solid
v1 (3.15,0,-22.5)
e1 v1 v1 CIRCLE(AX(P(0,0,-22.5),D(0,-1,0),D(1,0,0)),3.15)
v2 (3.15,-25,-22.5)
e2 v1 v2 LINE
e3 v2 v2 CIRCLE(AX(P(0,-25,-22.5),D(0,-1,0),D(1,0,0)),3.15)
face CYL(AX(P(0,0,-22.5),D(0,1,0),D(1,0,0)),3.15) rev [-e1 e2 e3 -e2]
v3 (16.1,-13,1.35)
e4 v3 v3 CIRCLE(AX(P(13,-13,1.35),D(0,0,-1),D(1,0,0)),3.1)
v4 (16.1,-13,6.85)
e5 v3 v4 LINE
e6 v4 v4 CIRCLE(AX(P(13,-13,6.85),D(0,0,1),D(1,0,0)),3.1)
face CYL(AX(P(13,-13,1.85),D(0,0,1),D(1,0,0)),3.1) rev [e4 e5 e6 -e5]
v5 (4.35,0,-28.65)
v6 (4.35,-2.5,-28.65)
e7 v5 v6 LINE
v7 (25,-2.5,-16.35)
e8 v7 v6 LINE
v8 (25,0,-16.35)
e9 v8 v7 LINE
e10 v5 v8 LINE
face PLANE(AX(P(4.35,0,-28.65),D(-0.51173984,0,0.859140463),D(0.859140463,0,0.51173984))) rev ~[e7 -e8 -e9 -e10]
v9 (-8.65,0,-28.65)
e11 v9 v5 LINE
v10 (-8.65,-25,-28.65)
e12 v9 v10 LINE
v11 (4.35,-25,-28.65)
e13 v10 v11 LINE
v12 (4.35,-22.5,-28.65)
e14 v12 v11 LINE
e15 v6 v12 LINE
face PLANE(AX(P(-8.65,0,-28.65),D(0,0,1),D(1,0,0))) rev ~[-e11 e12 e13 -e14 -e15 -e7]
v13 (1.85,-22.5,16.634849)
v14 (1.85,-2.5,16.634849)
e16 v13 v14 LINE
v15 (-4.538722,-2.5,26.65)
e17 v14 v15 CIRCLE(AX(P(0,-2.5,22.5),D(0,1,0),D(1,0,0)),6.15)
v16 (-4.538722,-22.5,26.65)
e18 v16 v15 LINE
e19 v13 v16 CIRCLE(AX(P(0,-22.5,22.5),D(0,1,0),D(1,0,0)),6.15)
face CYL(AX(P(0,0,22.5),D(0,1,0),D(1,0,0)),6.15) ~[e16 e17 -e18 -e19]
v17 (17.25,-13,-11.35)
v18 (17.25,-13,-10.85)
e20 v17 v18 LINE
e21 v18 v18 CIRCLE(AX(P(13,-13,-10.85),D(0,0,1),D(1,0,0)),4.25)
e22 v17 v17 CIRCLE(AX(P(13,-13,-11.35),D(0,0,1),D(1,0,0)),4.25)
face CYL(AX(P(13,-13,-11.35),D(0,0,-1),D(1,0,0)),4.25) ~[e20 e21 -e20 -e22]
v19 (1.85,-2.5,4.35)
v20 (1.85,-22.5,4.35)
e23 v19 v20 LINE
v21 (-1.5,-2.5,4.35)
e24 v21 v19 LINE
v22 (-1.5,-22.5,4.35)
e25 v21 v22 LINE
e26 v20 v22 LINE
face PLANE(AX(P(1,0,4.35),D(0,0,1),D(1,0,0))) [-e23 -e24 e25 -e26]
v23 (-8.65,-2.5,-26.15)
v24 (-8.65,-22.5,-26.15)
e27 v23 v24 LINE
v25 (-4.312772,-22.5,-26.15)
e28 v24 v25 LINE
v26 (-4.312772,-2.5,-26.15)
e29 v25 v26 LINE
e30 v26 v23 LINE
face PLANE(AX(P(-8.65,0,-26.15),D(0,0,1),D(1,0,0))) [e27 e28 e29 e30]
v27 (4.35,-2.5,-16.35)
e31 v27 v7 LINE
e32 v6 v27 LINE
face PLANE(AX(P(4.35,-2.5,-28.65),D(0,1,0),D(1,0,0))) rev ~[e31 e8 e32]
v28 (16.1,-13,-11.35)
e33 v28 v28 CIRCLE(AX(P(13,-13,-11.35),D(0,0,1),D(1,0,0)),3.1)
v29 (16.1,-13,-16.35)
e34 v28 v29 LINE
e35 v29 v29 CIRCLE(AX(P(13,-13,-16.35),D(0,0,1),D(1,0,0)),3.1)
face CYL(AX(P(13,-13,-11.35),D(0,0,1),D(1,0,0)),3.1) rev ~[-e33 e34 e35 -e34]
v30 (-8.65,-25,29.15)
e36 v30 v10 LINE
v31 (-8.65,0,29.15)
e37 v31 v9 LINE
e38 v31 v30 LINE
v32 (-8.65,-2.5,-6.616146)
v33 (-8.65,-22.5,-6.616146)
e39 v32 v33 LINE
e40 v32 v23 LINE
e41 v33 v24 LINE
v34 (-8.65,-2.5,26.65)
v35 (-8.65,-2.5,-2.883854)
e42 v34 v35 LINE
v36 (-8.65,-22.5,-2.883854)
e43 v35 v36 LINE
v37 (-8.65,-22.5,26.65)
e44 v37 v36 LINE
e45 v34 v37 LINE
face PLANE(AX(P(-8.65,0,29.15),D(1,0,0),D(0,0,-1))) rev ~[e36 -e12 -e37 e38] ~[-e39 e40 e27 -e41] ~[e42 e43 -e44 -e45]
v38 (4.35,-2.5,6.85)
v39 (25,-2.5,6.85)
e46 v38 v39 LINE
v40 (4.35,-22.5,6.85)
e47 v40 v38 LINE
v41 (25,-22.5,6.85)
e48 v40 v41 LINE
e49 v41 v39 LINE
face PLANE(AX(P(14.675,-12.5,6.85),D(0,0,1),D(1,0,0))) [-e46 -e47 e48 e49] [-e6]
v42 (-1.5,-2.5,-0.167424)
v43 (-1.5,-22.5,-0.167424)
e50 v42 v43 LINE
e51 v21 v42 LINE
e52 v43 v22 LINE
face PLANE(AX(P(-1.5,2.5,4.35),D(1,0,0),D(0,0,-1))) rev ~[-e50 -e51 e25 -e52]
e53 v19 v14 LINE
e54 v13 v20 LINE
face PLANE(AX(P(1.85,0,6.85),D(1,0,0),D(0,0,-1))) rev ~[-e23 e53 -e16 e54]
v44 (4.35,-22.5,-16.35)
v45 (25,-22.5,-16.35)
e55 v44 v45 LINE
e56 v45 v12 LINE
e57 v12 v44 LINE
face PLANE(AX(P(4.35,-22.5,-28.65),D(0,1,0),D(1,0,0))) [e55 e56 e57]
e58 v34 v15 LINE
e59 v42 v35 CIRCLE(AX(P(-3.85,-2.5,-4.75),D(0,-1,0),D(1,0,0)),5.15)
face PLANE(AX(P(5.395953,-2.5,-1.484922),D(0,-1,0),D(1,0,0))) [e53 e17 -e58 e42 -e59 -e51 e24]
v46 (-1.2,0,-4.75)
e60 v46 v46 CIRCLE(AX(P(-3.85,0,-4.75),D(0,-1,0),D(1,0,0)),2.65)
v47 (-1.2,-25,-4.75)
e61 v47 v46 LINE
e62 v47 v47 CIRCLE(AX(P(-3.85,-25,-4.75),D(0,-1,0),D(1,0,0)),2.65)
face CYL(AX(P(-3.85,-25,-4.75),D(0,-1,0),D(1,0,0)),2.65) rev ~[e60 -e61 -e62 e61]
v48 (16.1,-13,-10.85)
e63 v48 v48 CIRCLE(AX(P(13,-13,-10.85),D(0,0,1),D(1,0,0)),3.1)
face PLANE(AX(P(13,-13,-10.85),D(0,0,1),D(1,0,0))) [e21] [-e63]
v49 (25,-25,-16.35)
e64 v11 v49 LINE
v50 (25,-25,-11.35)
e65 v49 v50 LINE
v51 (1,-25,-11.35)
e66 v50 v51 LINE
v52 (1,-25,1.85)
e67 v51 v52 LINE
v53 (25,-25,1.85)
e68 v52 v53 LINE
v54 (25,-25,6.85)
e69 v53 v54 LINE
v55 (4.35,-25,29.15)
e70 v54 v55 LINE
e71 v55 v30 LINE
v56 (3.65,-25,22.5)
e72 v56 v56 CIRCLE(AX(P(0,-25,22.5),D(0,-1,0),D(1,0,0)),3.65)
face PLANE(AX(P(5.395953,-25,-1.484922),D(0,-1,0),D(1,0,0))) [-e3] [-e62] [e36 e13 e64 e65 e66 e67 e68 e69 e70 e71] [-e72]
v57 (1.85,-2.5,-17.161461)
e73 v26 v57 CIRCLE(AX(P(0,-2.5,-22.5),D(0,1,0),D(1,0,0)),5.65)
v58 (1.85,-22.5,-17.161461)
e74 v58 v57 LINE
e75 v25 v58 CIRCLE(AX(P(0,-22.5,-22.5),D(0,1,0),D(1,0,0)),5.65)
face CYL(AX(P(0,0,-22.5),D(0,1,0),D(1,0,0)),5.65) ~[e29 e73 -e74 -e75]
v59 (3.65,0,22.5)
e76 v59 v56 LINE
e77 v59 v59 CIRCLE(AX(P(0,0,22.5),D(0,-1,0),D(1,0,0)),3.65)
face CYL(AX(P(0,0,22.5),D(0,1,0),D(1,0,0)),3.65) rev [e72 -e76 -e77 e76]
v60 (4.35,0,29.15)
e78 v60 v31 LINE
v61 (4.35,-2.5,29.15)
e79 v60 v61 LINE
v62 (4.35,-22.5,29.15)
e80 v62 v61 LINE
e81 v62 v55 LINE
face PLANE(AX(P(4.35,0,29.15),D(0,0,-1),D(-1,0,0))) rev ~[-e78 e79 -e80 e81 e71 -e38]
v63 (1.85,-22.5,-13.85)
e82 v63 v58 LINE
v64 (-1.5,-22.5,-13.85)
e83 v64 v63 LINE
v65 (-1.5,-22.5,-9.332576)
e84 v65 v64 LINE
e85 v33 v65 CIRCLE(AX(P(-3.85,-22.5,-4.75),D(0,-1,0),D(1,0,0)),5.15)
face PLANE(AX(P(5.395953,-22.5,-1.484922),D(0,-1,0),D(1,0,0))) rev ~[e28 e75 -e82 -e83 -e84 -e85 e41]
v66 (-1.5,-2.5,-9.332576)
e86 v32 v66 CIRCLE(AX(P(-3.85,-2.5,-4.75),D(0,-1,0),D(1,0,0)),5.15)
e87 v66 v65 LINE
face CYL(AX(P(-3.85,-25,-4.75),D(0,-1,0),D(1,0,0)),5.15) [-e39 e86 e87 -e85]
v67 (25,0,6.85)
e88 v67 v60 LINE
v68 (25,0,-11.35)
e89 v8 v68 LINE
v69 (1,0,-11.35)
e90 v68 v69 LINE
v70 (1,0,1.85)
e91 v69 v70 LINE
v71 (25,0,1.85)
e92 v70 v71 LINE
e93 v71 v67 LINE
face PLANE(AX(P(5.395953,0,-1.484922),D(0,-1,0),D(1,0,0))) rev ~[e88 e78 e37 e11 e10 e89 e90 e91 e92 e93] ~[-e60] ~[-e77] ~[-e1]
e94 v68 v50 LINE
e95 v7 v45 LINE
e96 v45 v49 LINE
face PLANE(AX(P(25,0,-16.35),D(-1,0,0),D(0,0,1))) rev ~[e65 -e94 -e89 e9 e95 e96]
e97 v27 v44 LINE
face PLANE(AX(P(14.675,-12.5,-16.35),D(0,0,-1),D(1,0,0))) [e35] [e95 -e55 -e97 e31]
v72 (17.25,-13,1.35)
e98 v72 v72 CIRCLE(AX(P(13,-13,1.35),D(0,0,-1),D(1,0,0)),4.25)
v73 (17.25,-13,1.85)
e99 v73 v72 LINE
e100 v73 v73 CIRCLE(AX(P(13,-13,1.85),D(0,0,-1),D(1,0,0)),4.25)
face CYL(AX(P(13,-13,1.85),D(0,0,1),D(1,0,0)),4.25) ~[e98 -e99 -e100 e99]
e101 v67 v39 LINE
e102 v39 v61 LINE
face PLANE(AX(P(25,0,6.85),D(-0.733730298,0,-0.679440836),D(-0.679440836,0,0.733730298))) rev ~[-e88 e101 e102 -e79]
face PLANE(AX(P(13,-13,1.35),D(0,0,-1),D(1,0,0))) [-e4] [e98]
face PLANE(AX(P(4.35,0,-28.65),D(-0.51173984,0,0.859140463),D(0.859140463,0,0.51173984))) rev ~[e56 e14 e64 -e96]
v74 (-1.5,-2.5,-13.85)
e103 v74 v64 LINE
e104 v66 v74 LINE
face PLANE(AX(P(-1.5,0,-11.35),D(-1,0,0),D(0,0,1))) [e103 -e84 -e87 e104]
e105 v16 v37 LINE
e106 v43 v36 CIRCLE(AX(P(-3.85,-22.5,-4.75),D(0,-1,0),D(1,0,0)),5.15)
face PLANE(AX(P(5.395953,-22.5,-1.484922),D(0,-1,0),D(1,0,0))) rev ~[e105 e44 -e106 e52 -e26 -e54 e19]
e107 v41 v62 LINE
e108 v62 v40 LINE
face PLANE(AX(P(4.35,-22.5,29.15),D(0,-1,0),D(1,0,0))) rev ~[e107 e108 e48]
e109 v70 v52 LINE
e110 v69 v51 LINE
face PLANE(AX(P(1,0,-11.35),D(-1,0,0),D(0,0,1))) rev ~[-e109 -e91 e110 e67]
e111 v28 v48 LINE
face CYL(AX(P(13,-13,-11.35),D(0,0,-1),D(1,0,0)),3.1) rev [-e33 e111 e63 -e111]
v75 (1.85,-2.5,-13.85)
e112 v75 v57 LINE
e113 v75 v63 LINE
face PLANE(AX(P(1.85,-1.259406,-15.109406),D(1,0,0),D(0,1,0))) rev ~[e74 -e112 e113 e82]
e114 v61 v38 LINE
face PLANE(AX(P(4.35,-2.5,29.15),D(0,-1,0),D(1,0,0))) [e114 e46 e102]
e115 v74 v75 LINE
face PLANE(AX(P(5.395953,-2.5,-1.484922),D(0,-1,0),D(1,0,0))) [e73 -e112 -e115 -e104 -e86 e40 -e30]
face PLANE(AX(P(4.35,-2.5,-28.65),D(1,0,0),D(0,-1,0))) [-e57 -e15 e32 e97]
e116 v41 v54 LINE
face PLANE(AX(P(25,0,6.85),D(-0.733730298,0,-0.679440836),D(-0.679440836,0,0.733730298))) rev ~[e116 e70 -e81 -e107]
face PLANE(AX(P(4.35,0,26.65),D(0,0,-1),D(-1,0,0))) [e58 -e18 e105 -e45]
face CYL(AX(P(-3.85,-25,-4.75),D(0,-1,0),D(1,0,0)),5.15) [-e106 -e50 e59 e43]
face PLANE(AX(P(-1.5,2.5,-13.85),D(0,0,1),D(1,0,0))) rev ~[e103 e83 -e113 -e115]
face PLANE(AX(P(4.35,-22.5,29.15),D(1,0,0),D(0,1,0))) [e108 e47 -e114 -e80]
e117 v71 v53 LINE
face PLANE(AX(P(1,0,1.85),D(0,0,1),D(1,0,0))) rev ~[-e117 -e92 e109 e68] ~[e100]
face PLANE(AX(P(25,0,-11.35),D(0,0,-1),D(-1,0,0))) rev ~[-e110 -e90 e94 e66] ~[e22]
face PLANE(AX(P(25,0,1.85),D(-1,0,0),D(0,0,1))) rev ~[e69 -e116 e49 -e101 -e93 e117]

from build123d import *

# Parameters (mm, degrees)
F0_R          = 3.15
F0_R_2        = 3.65
F1_DEPTH      = 25
F2_R          = 3.1
F3_DEPTH      = 17.301
F3_DEPTH_BACK = 40.501
F2_R_2        = 4.25
F4_DEPTH      = 0.5
F5_R          = 4.25
F5_R_2        = 3.1
F6_DEPTH      = 0.5
F7_W          = 20.65
F7_H          = 20
F8_DEPTH      = 22.3
F9_W          = 20.65
F9_H          = 20
F10_DEPTH     = 12.3
F11_R         = 2.65
F12_DEPTH     = 25.001
F13_T         = 2.5
F13_T3_DEPTH  = 27.3
F13_T5_DEPTH  = 25.65
F13_T7_DEPTH  = 30
F13_T9_DEPTH  = 25
F13_T11_DEPTH = 17.3


# Not quite as in the source:
# - a shell that OpenCascade refuses in one call is made with other operations: the cavity is built on its own and cut out


with BuildPart() as f1:
    # F0 (on Front) → F1 (new body)
    with BuildSketch(Plane.XZ):
        Polygon((4.35, 29.15), (-8.65, 29.15), (-8.65, -28.65), (4.35, -28.65), (25, -16.35), (25, -11.35), (1, -11.35), (1, 1.85), (25, 1.85), (25, 6.85), align=None)
        with Locations((0, -22.5)):
            Circle(F0_R, mode=Mode.SUBTRACT)
        with Locations((0, 22.5)):
            Circle(F0_R_2, mode=Mode.SUBTRACT)
    extrude(amount=F1_DEPTH)

    # F2 (on face) → F3 (cut, two sides)
    with BuildSketch(Plane.XY.offset(-11.35)) as f3_sk:
        with Locations((13, -13)):
            Circle(F2_R)
    extrude(amount=-F3_DEPTH, mode=Mode.SUBTRACT)
    extrude(f3_sk.sketch, amount=F3_DEPTH_BACK, mode=Mode.SUBTRACT)

    # F2 (on face) → F4 (join)
    with BuildSketch(Plane.XY.offset(-11.35)):
        with Locations((13, -13)):
            Circle(F2_R_2)
        with Locations((13, -13)):
            Circle(F2_R, mode=Mode.SUBTRACT)
    extrude(amount=F4_DEPTH)

    # F5 (on face) → F6 (join)
    with BuildSketch(Plane(origin=(0, 0, 1.85), x_dir=(1, 0, 0), z_dir=(0, 0, -1))):
        with Locations((13, 13)):
            Circle(F5_R)
        with Locations((13, 13)):
            Circle(F5_R_2, mode=Mode.SUBTRACT)
    extrude(amount=F6_DEPTH)

    # F7 (on face) → F8 (cut)
    with BuildSketch(Plane.XY.offset(29.15)):
        with Locations((14.675, -12.5)):
            Rectangle(F7_W, F7_H)
    extrude(amount=-F8_DEPTH, mode=Mode.SUBTRACT)

    # F9 (on face) → F10 (cut)
    with BuildSketch(Plane(origin=(0, 0, -28.65), x_dir=(1, 0, 0), z_dir=(0, 0, -1))):
        with Locations((14.675, 12.5)):
            Rectangle(F9_W, F9_H)
    extrude(amount=-F10_DEPTH, mode=Mode.SUBTRACT)

    # F11 (on face) → F12 (cut, through all)
    with BuildSketch(Plane.XZ.offset(25)):
        with Locations((-3.85, -4.75)):
            Circle(F11_R)
    extrude(amount=-F12_DEPTH, mode=Mode.SUBTRACT)

    # F13: shell of thickness 2.5, made by hand


with BuildPart() as f13_core1:
    # F13_t2: copy of F1
    add(f1.part)

    # the walls: a layer under each face that stays
    f13_faces = [f13_core1.faces().sort_by_distance(p)[0] for p in [
        (14.675, -1.25, 18),
        (-3.0416666667, 0, -19.0166666667),
        (-2.15, -12.5, 29.15),
        (14.675, -2.5, 10.5666666667),
        (25, -12.5, 4.35),
        (5, -20.8333333333, 1.85),
        (1, -12.5, -4.75),
        (-2.15, -12.5, -28.65),
        (21, -20.8333333333, -11.35),
        (14.675, -1.25, -22.5),
        (25, -12.5, -13.85),
        (-6.5, -12.5, -4.75),
        (-3.15, -12.5, -22.5),
        (-3.65, -12.5, 22.5),
        (4.35, -12.5, 18),
        (14.675, -23.75, 18),
        (-3.0416666667, -25, -19.0166666667),
        (7.7916666667, -19.1666666667, 6.85),
        (8.75, -13, 1.6),
        (4.35, -12.5, -22.5),
        (14.675, -23.75, -22.5),
        (8.75, -13, -11.1),
        (7.7916666667, -2.5, -18.4),
        (7.7916666667, -5.8333333333, -16.35),
        (7.7916666667, -22.5, 10.5666666667),
        (9.9, -13, 4.35),
        (10.1666666667, -10.1666666667, 1.35),
        (14.675, -22.5, -18.4),
        (10.1666666667, -15.8333333333, -10.85),
        (9.9, -13, -13.85),
        (9.9, -13, 1.6),
        (9.9, -13, -11.1),
    ]]
    thicken(f13_faces, amount=-F13_T, mode=Mode.SUBTRACT)

    # F13_s4 → F13_t3 (cut)
    with BuildSketch(Plane.XY.offset(4.35)):
        Polygon((4.375, -2.525), (4.35, 0), (1.85, 0), (1.85, -2.5), align=None)
        Polygon((4.375, -22.475), (1.85, -22.5), (1.85, -25), (4.35, -25), align=None)
    extrude(amount=F13_T3_DEPTH, mode=Mode.SUBTRACT)

    # F13_s6 → F13_t5 (cut)
    with BuildSketch(Plane.YZ.offset(1.85)):
        Polygon((-2.525, 6.875), (0, 6.85), (0, 4.35), (-2.5, 4.35), align=None)
        Polygon((-22.475, 6.875), (-22.5, 4.35), (-25, 4.35), (-25, 6.85), align=None)
        Polygon((-2.525, -16.375), (0, -16.35), (0, -13.85), (-2.5, -13.85), align=None)
        Polygon((-22.475, -16.375), (-22.5, -13.85), (-25, -13.85), (-25, -16.35), align=None)
    extrude(amount=F13_T5_DEPTH, mode=Mode.SUBTRACT)

    # F13_s8 → F13_t7 (cut)
    with BuildSketch(Plane.XZ.offset(-2.5)):
        Polygon((1.025, 1.825), (1, 4.35), (-1.5, 4.35), (-1.5, 1.85), align=None)
        Polygon((1.025, -11.325), (-1.5, -11.35), (-1.5, -13.85), (1, -13.85), align=None)
    extrude(amount=F13_T7_DEPTH, mode=Mode.SUBTRACT)

    # F13_s10 → F13_t9 (cut)
    with BuildSketch(Plane.XZ):
        Polygon((4.375, 6.875), (1.85, 6.85), (1.85, 4.35), (4.35, 4.35), align=None)
        Polygon((4.375, -16.375), (1.85, -16.35), (1.85, -13.85), (4.35, -13.85), align=None)
    extrude(amount=F13_T9_DEPTH, mode=Mode.SUBTRACT)

    # F13_s12 → F13_t11 (cut)
    with BuildSketch(Plane.XY.offset(-31.15)):
        Polygon((4.375, -22.475), (1.85, -22.5), (1.85, -25), (4.35, -25), align=None)
        Polygon((4.375, -2.525), (1.85, -2.5), (1.85, 0), (4.35, 0), align=None)
    extrude(amount=F13_T11_DEPTH, mode=Mode.SUBTRACT)

    # F13_s13 → F13_t14 (revolve, cut)
    with BuildSketch(Plane.XZ.offset(13)):
        Polygon((17.275, 1.825), (17.25, 4.35), (14.75, 4.35), (14.75, 1.85), align=None)
    revolve(axis=Axis((13, -13, 1.85), (0, 0, -1)), mode=Mode.SUBTRACT)

    # F13_s15 → F13_t16 (revolve, cut)
    with BuildSketch(Plane.XZ.offset(13)):
        Polygon((17.275, -11.325), (17.25, -13.85), (14.75, -13.85), (14.75, -11.35), align=None)
    revolve(axis=Axis((13, -13, -11.35), (0, 0, 1)), mode=Mode.SUBTRACT)


with BuildPart() as f1_1:
    add(f1.part)

    # what is left inside the walls is the cavity
    f13_cavity = [f13_core1.part.solids().sort_by_distance(p)[0] for p in [
        (-8.625, -15.833333, 11.883073),
        (-8.625, -15.833333, -16.383073),
    ]]
    add(f13_cavity, mode=Mode.SUBTRACT)


solid = f1_1.part
